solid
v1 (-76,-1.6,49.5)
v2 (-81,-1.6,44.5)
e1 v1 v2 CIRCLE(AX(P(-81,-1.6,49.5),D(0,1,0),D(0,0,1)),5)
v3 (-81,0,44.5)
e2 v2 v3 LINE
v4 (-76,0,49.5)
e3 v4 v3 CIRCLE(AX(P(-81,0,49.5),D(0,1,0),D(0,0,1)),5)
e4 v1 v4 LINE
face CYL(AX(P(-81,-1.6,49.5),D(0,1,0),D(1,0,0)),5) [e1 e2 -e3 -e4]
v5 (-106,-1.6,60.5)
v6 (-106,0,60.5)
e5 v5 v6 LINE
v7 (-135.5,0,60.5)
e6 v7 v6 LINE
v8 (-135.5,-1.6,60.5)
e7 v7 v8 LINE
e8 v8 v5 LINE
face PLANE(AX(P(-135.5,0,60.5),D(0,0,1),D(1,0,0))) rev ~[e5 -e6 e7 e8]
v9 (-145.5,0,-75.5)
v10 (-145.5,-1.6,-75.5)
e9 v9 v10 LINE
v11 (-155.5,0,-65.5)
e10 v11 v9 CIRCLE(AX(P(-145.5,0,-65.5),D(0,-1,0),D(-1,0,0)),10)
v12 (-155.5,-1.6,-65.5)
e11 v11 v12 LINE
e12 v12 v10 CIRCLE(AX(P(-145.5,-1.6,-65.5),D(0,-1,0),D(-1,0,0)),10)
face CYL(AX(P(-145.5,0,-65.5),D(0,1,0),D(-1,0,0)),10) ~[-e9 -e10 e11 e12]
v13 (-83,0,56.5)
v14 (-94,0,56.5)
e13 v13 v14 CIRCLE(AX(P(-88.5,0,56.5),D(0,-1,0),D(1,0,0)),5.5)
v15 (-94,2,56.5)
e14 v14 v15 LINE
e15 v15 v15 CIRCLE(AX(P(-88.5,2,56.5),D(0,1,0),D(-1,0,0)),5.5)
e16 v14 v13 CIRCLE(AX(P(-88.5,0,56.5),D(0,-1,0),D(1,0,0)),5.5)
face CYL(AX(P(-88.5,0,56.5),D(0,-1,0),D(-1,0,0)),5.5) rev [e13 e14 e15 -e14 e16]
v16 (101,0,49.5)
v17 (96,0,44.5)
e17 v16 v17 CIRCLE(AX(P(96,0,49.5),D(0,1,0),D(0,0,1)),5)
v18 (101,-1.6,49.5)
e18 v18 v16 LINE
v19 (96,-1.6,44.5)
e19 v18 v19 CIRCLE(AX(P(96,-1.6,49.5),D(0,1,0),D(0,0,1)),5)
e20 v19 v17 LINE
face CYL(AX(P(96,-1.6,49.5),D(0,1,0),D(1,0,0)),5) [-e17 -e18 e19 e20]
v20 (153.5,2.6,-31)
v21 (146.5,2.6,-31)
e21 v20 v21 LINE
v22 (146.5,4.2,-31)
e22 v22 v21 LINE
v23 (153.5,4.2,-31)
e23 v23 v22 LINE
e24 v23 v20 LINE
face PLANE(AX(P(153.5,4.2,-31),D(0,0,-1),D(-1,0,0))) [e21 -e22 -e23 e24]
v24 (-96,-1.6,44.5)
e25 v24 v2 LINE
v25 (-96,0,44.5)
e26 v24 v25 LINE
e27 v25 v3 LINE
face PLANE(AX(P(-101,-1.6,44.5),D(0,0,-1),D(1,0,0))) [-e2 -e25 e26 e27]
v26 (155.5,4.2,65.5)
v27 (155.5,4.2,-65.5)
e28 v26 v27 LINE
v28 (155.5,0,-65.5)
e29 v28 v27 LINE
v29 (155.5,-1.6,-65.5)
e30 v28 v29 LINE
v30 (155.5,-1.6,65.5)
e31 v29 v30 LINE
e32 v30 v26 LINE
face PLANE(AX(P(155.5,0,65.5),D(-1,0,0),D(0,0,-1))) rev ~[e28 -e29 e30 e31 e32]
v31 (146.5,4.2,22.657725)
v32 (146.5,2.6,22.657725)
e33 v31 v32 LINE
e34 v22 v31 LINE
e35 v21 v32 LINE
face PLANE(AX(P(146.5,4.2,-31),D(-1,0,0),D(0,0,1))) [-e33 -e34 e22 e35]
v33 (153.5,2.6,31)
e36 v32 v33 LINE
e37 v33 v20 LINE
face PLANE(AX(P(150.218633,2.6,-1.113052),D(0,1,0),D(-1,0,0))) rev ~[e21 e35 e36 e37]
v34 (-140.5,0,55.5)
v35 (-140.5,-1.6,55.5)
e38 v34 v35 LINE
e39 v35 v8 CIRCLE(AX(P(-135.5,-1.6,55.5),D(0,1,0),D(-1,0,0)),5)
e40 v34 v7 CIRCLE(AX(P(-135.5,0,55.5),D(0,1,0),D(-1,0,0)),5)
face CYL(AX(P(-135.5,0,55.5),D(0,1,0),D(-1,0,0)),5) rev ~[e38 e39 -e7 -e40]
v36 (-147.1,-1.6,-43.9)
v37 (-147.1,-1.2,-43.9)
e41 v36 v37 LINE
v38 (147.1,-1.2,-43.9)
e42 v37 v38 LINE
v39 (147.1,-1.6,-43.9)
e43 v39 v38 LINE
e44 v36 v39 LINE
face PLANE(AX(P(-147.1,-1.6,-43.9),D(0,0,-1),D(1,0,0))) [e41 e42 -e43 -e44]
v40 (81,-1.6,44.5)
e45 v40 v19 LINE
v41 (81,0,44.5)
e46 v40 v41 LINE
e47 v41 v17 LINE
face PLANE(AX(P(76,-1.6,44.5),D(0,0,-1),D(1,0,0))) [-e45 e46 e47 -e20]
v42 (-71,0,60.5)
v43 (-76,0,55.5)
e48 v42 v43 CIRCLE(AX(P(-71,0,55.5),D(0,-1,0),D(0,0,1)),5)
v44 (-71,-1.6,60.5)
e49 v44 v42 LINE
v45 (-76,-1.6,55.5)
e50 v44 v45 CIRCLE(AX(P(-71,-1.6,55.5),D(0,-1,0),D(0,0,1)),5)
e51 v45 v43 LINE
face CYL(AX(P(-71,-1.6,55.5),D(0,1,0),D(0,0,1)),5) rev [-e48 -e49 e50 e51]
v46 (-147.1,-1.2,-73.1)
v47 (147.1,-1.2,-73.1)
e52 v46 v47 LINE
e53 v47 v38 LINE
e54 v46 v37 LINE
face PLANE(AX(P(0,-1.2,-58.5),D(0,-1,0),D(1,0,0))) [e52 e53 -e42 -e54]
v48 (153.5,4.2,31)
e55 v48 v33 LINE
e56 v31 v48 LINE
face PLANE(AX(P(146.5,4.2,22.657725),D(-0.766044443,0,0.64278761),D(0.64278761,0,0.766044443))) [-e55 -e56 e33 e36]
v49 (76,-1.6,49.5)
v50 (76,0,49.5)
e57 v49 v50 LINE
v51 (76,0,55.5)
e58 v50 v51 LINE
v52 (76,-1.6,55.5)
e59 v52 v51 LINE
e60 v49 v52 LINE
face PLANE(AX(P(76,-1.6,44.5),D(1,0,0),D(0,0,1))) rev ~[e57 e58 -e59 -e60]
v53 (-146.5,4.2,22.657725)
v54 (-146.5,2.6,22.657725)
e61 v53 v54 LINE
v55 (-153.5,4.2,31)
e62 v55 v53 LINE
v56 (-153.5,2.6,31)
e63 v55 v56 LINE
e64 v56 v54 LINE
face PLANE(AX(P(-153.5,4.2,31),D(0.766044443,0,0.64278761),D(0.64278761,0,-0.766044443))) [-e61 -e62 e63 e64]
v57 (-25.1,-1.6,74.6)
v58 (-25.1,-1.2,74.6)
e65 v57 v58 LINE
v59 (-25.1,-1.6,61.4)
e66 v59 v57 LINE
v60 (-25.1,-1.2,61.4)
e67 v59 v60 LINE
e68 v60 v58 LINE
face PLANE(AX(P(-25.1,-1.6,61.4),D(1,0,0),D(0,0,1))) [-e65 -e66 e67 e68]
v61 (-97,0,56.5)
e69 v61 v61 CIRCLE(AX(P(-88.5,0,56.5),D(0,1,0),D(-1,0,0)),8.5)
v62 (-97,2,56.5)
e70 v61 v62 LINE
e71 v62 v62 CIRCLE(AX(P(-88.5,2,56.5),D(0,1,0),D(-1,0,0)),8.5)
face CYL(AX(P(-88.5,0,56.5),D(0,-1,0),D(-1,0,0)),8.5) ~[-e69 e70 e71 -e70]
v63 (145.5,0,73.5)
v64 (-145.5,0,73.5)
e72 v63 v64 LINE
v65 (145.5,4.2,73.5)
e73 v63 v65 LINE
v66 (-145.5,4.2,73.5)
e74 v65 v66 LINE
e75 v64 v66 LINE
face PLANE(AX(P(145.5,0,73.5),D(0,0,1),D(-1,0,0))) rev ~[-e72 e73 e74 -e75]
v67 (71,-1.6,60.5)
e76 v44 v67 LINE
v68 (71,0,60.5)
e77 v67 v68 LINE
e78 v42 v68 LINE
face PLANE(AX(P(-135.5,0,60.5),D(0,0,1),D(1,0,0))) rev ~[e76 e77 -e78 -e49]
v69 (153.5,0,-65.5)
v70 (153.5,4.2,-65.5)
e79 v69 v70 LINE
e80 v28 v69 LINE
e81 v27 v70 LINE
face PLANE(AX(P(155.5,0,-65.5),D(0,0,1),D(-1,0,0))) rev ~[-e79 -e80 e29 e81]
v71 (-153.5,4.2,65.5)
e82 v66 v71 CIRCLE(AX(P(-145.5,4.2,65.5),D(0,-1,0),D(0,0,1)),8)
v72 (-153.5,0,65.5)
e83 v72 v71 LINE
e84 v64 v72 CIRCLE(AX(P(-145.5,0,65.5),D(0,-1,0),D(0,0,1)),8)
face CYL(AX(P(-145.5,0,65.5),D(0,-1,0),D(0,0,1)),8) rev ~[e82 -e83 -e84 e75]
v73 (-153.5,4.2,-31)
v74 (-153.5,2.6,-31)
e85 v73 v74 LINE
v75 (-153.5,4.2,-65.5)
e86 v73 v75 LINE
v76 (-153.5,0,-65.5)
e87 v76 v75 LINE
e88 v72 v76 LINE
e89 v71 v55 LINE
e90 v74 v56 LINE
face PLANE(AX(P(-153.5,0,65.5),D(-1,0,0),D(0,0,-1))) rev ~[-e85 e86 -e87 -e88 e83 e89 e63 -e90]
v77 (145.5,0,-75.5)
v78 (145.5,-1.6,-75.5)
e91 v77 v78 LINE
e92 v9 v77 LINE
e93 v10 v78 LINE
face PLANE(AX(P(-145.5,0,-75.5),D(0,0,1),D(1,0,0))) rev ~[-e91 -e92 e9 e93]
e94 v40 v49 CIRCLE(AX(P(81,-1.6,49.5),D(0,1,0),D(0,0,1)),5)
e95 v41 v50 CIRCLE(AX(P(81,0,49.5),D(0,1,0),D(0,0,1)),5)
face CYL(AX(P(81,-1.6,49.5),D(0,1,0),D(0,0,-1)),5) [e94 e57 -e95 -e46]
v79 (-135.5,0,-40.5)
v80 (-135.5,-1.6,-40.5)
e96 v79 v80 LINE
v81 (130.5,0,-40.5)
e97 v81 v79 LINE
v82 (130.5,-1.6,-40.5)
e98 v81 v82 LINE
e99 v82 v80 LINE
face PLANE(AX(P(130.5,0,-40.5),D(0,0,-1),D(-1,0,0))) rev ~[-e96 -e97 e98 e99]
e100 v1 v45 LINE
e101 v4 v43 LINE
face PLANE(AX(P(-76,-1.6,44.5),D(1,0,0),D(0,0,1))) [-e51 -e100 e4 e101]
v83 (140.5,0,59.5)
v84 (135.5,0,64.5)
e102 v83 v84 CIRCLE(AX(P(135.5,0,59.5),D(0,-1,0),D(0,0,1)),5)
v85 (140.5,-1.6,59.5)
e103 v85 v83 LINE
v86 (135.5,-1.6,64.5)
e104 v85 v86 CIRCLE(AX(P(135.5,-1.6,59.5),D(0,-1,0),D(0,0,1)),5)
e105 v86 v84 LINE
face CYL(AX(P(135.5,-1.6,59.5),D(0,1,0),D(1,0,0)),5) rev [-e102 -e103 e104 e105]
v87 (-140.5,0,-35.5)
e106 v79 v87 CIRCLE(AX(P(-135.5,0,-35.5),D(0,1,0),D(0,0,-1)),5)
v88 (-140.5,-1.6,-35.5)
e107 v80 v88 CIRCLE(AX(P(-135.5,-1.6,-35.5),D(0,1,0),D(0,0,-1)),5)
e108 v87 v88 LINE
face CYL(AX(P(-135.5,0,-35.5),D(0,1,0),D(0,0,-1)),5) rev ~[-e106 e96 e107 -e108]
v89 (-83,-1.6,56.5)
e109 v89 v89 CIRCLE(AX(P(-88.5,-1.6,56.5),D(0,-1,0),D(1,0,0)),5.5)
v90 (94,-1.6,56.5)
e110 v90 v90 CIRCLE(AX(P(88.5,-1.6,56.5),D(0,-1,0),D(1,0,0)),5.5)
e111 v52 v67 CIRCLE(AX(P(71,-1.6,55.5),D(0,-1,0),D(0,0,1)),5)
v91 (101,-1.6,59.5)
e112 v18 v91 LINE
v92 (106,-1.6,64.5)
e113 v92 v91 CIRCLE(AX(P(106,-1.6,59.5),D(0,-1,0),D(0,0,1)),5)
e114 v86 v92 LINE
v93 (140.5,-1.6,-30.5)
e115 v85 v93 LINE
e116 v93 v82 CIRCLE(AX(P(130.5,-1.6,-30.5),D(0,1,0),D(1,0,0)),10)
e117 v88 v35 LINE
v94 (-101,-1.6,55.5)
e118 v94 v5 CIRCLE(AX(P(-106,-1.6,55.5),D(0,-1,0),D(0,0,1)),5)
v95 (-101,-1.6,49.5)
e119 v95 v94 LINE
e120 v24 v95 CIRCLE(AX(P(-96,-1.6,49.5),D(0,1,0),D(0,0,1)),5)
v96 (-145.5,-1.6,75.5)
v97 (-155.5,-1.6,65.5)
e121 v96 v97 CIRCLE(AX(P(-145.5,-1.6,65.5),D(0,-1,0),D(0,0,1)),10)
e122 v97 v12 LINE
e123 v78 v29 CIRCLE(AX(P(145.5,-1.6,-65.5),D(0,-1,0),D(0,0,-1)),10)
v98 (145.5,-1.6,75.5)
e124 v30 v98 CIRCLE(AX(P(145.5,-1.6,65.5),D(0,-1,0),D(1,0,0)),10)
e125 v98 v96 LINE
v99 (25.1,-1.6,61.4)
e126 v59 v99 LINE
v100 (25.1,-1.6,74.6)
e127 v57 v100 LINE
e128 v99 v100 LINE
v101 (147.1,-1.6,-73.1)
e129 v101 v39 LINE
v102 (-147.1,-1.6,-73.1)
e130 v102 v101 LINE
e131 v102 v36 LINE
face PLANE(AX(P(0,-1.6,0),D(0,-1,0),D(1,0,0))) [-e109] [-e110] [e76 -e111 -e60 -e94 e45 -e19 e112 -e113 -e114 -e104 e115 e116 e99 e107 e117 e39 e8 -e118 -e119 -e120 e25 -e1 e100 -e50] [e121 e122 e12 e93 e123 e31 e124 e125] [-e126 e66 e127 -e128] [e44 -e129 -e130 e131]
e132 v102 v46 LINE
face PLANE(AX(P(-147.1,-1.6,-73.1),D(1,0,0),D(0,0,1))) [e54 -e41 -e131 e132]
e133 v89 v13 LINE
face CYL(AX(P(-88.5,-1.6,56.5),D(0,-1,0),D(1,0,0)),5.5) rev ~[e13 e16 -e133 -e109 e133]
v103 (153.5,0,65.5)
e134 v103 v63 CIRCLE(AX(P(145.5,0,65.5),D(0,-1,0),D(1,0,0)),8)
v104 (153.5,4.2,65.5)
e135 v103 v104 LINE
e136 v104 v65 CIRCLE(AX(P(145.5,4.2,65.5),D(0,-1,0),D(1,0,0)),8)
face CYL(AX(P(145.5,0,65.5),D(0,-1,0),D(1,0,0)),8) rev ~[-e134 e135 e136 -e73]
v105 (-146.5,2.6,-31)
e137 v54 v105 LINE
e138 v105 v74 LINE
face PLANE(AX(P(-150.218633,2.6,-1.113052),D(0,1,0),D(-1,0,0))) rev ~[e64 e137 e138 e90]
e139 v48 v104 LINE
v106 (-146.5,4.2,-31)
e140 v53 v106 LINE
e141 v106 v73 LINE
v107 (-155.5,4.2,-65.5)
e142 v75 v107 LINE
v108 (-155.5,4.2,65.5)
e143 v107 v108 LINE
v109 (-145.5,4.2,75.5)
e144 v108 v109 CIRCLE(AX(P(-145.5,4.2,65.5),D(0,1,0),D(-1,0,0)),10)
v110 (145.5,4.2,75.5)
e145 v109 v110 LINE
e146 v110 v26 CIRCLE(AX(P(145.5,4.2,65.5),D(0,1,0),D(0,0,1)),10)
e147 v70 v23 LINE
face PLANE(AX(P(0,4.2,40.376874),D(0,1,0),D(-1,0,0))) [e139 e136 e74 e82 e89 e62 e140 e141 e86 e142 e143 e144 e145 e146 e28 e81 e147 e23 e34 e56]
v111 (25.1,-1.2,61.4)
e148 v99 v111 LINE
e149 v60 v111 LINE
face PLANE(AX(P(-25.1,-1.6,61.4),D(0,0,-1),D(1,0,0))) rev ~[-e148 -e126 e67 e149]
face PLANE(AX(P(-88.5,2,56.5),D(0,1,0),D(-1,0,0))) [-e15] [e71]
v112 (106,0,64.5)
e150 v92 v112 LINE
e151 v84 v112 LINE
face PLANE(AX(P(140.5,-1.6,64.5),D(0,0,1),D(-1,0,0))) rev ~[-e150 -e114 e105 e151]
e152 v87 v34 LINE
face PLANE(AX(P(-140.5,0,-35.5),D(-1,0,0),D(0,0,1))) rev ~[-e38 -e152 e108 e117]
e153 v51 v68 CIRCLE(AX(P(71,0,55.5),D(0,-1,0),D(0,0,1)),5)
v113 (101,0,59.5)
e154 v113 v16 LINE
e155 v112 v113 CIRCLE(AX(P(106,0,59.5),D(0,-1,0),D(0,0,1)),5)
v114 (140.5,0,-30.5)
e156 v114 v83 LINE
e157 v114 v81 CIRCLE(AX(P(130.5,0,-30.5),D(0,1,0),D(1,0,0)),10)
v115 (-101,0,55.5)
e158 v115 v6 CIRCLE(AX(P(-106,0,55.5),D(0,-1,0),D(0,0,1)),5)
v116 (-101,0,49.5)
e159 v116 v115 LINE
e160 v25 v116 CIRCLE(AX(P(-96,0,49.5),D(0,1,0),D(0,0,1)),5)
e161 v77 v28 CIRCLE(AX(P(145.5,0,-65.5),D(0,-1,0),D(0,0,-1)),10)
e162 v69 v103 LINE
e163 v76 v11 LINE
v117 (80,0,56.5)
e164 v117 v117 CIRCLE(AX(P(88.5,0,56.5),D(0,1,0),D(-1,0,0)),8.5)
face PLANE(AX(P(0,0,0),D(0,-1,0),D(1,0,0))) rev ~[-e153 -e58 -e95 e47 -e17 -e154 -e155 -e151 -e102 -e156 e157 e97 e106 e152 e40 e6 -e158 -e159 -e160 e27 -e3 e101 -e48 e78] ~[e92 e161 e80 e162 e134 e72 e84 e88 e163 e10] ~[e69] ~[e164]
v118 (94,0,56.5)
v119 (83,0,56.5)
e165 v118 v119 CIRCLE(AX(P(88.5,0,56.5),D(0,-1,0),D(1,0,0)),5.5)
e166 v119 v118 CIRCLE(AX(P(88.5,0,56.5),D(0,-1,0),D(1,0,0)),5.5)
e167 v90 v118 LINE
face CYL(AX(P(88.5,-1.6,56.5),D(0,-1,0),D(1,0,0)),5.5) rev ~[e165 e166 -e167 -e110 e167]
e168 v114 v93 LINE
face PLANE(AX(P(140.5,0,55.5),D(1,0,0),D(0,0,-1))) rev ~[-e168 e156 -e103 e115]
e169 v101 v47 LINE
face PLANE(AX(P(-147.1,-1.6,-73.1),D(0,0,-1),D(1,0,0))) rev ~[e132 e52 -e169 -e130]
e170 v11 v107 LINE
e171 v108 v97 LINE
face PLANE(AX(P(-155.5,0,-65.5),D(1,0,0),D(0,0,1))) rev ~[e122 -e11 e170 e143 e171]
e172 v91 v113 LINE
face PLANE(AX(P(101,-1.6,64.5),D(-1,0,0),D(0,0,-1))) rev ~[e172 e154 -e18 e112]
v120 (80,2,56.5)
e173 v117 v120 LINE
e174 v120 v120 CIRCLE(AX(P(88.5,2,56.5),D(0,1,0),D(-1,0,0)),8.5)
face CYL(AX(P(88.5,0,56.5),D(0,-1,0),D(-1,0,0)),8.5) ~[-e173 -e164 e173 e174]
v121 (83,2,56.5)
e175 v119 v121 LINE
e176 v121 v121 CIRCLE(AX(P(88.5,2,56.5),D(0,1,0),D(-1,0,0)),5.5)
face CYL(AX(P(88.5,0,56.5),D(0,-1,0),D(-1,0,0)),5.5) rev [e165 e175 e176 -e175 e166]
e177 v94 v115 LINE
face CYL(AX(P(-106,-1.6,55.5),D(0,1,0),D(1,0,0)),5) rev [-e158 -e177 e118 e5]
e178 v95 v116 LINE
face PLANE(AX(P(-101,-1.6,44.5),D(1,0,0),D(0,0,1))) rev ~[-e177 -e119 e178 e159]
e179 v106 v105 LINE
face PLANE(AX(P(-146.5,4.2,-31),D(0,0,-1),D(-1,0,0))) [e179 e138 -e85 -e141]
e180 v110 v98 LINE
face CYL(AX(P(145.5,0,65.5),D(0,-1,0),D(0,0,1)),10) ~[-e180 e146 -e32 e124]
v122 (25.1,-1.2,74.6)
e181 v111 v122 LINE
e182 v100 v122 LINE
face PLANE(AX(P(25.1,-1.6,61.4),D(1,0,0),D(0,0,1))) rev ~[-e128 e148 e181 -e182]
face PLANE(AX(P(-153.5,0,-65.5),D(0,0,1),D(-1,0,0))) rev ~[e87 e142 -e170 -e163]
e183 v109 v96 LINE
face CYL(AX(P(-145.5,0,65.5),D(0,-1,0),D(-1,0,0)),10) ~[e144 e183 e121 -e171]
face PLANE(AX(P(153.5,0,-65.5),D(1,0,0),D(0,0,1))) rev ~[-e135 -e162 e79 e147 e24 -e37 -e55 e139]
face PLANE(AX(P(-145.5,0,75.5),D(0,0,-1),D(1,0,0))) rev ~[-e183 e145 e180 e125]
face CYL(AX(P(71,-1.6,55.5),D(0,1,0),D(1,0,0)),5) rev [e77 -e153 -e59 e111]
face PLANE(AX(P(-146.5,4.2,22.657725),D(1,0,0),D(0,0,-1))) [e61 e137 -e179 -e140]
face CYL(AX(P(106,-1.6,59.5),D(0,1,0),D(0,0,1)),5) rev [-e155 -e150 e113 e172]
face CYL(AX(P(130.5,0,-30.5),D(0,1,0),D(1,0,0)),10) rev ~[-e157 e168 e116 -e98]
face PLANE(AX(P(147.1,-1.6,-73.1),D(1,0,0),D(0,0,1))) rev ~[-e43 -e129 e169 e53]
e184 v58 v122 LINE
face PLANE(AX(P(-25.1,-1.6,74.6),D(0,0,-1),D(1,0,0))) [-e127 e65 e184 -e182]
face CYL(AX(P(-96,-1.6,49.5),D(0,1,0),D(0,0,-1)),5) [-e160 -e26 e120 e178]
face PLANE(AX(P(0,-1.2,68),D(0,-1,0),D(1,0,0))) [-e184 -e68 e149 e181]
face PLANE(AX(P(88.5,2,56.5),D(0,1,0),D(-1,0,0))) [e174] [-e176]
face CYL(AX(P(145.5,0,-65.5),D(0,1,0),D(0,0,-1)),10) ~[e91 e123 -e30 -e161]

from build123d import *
from build123d import SkipClean  # not in build123d's __all__

# Parameters (mm, degrees)
F1_DEPTH  = 1.6
F2_W      = 25
F2_H      = 16
F3_DEPTH  = 1.6
F5_DEPTH  = 25
F6_R      = 5
F8_R      = 5.5
F9_DEPTH  = 25
F12_R     = 8.5
F12_R_2   = 5.5
F13_DEPTH = 2
F15_DEPTH = 4.2
F17_DEPTH = 1.6
F19_W     = 294.2
F19_H     = 29.2
F19_W_2   = 50.2
F19_H_2   = 13.2
F20_DEPTH = 0.4


# Not quite as in the source:
# - two fillets or chamfers of one size are made in one step
# - after a boolean that leaves OpenCascade's solid faulty, fix() repairs it


with BuildPart() as f1:
    # F0 (on Front) → F1 (new body)
    with BuildSketch(Plane.XZ):
        with BuildLine():
            ThreePointArc((155.5, 65.5), (152.5710678119, 72.5710678119), (145.5, 75.5))
            Line((145.5, 75.5), (-145.5, 75.5))
            ThreePointArc((-145.5, 75.5), (-152.5710678119, 72.5710678119), (-155.5, 65.5))
            Line((-155.5, 65.5), (-155.5, -65.5))
            ThreePointArc((-155.5, -65.5), (-152.5710678119, -72.5710678119), (-145.5, -75.5))
            Line((-145.5, -75.5), (145.5, -75.5))
            ThreePointArc((145.5, -75.5), (152.5710678119, -72.5710678119), (155.5, -65.5))
            Line((155.5, -65.5), (155.5, 65.5))
        make_face()
        with BuildLine():
            Line((-135.5, 60.5), (135.5, 60.5))
            ThreePointArc((135.5, 60.5), (139.0355339059, 59.0355339059), (140.5, 55.5))
            Line((140.5, 55.5), (140.5, -30.5))
            ThreePointArc((140.5, -30.5), (137.5710678119, -37.5710678119), (130.5, -40.5))
            Line((130.5, -40.5), (-135.5, -40.5))
            ThreePointArc((-135.5, -40.5), (-139.0355339059, -39.0355339059), (-140.5, -35.5))
            Line((-140.5, -35.5), (-140.5, 55.5))
            ThreePointArc((-140.5, 55.5), (-139.0355339059, 59.0355339059), (-135.5, 60.5))
        make_face(mode=Mode.SUBTRACT)
    extrude(amount=F1_DEPTH)

    # F2 (on face) → F3 (join, through all)
    with BuildSketch(Plane.XZ.offset(1.6)):
        with Locations((-88.5, 52.5)):
            Rectangle(F2_W, F2_H)
        with Locations((88.5, 52.5)):
            Rectangle(F2_W, F2_H)
    extrude(amount=-F3_DEPTH)

    # F4 (on face) → F5 (cut)
    with BuildSketch(Plane.XZ.offset(1.6)):
        Polygon((101, 64.5), (101, 60.5), (101, 55.5), (140.5, 55.5), (140.5, 64.5), align=None)
    extrude(amount=-F5_DEPTH, mode=Mode.SUBTRACT)

    # F6
    f6_edges = [f1.edges().sort_by_distance(p)[0] for p in [
        (-101, -0.8, 44.5),
        (-101, -0.8, 60.5),
        (-76, -0.8, 44.5),
        (-76, -0.8, 60.5),
        (101, -0.8, 44.5),
        (76, -0.8, 44.5),
        (76, -0.8, 60.5),
        (140.5, -0.8, 64.5),
        (101, -0.8, 64.5),
    ]]
    fillet(f6_edges, radius=F6_R)

    # F8 (on face) → F9 (cut)
    with BuildSketch(Plane.XZ.offset(1.6)):
        with Locations((-88.5, 56.5)):
            Circle(F8_R)
        with Locations((88.5, 56.5)):
            Circle(F8_R)
    extrude(amount=-F9_DEPTH, mode=Mode.SUBTRACT)

    # F12 (on face) → F13 (join)
    with BuildSketch(Plane(origin=(0, 0, 0), x_dir=(-1, 0, 0), z_dir=(0, 1, 0))):
        with Locations((-88.5, 56.5)):
            Circle(F12_R)
        with Locations((-88.5, 56.5)):
            Circle(F12_R_2, mode=Mode.SUBTRACT)
        with Locations((88.5, 56.5)):
            Circle(F12_R)
        with Locations((88.5, 56.5)):
            Circle(F12_R_2, mode=Mode.SUBTRACT)
    with SkipClean():  # cleaning this boolean's faces spoils the solid; the shape is the same uncleaned
        extrude(amount=F13_DEPTH)

    # F14 (on face) → F15 (join)
    with BuildSketch(Plane(origin=(0, 0, 0), x_dir=(-1, 0, 0), z_dir=(0, 1, 0))):
        with BuildLine():
            ThreePointArc((-145.5, 75.5), (-152.5710678119, 72.5710678119), (-155.5, 65.5))
            Line((-155.5, 65.5), (-155.5, -65.5))
            Line((-155.5, -65.5), (-153.5, -65.5))
            Line((-153.5, -65.5), (-153.5, 65.5))
            ThreePointArc((-153.5, 65.5), (-151.1568542495, 71.1568542495), (-145.5, 73.5))
            Line((-145.5, 73.5), (145.5, 73.5))
            ThreePointArc((145.5, 73.5), (151.1568542495, 71.1568542495), (153.5, 65.5))
            Line((153.5, 65.5), (153.5, -65.5))
            Line((153.5, -65.5), (155.5, -65.5))
            Line((155.5, -65.5), (155.5, 65.5))
            ThreePointArc((155.5, 65.5), (152.5710678119, 72.5710678119), (145.5, 75.5))
            Line((145.5, 75.5), (-145.5, 75.5))
        make_face()
    extrude(amount=F15_DEPTH)

    add(f1.part.fix(), mode=Mode.REPLACE)

    # F16 (on face) → F17 (join)
    with BuildSketch(Plane(origin=(0, 4.2, 0), x_dir=(-1, 0, 0), z_dir=(0, 1, 0))):
        Polygon((-153.5, 31), (-153.5, -31), (-146.5, -31), (-146.5, 22.6577248518), align=None)
        Polygon((146.5, -31), (153.5, -31), (153.5, 31), (146.5, 22.6577248518), align=None)
    extrude(amount=-F17_DEPTH)

    # F19 (on face) → F20 (cut)
    with BuildSketch(Plane.XZ.offset(1.6)):
        with Locations((0, -58.5)):
            Rectangle(F19_W, F19_H)
        with Locations((0, 68)):
            Rectangle(F19_W_2, F19_H_2)
    extrude(amount=-F20_DEPTH, mode=Mode.SUBTRACT)


solid = f1.part
